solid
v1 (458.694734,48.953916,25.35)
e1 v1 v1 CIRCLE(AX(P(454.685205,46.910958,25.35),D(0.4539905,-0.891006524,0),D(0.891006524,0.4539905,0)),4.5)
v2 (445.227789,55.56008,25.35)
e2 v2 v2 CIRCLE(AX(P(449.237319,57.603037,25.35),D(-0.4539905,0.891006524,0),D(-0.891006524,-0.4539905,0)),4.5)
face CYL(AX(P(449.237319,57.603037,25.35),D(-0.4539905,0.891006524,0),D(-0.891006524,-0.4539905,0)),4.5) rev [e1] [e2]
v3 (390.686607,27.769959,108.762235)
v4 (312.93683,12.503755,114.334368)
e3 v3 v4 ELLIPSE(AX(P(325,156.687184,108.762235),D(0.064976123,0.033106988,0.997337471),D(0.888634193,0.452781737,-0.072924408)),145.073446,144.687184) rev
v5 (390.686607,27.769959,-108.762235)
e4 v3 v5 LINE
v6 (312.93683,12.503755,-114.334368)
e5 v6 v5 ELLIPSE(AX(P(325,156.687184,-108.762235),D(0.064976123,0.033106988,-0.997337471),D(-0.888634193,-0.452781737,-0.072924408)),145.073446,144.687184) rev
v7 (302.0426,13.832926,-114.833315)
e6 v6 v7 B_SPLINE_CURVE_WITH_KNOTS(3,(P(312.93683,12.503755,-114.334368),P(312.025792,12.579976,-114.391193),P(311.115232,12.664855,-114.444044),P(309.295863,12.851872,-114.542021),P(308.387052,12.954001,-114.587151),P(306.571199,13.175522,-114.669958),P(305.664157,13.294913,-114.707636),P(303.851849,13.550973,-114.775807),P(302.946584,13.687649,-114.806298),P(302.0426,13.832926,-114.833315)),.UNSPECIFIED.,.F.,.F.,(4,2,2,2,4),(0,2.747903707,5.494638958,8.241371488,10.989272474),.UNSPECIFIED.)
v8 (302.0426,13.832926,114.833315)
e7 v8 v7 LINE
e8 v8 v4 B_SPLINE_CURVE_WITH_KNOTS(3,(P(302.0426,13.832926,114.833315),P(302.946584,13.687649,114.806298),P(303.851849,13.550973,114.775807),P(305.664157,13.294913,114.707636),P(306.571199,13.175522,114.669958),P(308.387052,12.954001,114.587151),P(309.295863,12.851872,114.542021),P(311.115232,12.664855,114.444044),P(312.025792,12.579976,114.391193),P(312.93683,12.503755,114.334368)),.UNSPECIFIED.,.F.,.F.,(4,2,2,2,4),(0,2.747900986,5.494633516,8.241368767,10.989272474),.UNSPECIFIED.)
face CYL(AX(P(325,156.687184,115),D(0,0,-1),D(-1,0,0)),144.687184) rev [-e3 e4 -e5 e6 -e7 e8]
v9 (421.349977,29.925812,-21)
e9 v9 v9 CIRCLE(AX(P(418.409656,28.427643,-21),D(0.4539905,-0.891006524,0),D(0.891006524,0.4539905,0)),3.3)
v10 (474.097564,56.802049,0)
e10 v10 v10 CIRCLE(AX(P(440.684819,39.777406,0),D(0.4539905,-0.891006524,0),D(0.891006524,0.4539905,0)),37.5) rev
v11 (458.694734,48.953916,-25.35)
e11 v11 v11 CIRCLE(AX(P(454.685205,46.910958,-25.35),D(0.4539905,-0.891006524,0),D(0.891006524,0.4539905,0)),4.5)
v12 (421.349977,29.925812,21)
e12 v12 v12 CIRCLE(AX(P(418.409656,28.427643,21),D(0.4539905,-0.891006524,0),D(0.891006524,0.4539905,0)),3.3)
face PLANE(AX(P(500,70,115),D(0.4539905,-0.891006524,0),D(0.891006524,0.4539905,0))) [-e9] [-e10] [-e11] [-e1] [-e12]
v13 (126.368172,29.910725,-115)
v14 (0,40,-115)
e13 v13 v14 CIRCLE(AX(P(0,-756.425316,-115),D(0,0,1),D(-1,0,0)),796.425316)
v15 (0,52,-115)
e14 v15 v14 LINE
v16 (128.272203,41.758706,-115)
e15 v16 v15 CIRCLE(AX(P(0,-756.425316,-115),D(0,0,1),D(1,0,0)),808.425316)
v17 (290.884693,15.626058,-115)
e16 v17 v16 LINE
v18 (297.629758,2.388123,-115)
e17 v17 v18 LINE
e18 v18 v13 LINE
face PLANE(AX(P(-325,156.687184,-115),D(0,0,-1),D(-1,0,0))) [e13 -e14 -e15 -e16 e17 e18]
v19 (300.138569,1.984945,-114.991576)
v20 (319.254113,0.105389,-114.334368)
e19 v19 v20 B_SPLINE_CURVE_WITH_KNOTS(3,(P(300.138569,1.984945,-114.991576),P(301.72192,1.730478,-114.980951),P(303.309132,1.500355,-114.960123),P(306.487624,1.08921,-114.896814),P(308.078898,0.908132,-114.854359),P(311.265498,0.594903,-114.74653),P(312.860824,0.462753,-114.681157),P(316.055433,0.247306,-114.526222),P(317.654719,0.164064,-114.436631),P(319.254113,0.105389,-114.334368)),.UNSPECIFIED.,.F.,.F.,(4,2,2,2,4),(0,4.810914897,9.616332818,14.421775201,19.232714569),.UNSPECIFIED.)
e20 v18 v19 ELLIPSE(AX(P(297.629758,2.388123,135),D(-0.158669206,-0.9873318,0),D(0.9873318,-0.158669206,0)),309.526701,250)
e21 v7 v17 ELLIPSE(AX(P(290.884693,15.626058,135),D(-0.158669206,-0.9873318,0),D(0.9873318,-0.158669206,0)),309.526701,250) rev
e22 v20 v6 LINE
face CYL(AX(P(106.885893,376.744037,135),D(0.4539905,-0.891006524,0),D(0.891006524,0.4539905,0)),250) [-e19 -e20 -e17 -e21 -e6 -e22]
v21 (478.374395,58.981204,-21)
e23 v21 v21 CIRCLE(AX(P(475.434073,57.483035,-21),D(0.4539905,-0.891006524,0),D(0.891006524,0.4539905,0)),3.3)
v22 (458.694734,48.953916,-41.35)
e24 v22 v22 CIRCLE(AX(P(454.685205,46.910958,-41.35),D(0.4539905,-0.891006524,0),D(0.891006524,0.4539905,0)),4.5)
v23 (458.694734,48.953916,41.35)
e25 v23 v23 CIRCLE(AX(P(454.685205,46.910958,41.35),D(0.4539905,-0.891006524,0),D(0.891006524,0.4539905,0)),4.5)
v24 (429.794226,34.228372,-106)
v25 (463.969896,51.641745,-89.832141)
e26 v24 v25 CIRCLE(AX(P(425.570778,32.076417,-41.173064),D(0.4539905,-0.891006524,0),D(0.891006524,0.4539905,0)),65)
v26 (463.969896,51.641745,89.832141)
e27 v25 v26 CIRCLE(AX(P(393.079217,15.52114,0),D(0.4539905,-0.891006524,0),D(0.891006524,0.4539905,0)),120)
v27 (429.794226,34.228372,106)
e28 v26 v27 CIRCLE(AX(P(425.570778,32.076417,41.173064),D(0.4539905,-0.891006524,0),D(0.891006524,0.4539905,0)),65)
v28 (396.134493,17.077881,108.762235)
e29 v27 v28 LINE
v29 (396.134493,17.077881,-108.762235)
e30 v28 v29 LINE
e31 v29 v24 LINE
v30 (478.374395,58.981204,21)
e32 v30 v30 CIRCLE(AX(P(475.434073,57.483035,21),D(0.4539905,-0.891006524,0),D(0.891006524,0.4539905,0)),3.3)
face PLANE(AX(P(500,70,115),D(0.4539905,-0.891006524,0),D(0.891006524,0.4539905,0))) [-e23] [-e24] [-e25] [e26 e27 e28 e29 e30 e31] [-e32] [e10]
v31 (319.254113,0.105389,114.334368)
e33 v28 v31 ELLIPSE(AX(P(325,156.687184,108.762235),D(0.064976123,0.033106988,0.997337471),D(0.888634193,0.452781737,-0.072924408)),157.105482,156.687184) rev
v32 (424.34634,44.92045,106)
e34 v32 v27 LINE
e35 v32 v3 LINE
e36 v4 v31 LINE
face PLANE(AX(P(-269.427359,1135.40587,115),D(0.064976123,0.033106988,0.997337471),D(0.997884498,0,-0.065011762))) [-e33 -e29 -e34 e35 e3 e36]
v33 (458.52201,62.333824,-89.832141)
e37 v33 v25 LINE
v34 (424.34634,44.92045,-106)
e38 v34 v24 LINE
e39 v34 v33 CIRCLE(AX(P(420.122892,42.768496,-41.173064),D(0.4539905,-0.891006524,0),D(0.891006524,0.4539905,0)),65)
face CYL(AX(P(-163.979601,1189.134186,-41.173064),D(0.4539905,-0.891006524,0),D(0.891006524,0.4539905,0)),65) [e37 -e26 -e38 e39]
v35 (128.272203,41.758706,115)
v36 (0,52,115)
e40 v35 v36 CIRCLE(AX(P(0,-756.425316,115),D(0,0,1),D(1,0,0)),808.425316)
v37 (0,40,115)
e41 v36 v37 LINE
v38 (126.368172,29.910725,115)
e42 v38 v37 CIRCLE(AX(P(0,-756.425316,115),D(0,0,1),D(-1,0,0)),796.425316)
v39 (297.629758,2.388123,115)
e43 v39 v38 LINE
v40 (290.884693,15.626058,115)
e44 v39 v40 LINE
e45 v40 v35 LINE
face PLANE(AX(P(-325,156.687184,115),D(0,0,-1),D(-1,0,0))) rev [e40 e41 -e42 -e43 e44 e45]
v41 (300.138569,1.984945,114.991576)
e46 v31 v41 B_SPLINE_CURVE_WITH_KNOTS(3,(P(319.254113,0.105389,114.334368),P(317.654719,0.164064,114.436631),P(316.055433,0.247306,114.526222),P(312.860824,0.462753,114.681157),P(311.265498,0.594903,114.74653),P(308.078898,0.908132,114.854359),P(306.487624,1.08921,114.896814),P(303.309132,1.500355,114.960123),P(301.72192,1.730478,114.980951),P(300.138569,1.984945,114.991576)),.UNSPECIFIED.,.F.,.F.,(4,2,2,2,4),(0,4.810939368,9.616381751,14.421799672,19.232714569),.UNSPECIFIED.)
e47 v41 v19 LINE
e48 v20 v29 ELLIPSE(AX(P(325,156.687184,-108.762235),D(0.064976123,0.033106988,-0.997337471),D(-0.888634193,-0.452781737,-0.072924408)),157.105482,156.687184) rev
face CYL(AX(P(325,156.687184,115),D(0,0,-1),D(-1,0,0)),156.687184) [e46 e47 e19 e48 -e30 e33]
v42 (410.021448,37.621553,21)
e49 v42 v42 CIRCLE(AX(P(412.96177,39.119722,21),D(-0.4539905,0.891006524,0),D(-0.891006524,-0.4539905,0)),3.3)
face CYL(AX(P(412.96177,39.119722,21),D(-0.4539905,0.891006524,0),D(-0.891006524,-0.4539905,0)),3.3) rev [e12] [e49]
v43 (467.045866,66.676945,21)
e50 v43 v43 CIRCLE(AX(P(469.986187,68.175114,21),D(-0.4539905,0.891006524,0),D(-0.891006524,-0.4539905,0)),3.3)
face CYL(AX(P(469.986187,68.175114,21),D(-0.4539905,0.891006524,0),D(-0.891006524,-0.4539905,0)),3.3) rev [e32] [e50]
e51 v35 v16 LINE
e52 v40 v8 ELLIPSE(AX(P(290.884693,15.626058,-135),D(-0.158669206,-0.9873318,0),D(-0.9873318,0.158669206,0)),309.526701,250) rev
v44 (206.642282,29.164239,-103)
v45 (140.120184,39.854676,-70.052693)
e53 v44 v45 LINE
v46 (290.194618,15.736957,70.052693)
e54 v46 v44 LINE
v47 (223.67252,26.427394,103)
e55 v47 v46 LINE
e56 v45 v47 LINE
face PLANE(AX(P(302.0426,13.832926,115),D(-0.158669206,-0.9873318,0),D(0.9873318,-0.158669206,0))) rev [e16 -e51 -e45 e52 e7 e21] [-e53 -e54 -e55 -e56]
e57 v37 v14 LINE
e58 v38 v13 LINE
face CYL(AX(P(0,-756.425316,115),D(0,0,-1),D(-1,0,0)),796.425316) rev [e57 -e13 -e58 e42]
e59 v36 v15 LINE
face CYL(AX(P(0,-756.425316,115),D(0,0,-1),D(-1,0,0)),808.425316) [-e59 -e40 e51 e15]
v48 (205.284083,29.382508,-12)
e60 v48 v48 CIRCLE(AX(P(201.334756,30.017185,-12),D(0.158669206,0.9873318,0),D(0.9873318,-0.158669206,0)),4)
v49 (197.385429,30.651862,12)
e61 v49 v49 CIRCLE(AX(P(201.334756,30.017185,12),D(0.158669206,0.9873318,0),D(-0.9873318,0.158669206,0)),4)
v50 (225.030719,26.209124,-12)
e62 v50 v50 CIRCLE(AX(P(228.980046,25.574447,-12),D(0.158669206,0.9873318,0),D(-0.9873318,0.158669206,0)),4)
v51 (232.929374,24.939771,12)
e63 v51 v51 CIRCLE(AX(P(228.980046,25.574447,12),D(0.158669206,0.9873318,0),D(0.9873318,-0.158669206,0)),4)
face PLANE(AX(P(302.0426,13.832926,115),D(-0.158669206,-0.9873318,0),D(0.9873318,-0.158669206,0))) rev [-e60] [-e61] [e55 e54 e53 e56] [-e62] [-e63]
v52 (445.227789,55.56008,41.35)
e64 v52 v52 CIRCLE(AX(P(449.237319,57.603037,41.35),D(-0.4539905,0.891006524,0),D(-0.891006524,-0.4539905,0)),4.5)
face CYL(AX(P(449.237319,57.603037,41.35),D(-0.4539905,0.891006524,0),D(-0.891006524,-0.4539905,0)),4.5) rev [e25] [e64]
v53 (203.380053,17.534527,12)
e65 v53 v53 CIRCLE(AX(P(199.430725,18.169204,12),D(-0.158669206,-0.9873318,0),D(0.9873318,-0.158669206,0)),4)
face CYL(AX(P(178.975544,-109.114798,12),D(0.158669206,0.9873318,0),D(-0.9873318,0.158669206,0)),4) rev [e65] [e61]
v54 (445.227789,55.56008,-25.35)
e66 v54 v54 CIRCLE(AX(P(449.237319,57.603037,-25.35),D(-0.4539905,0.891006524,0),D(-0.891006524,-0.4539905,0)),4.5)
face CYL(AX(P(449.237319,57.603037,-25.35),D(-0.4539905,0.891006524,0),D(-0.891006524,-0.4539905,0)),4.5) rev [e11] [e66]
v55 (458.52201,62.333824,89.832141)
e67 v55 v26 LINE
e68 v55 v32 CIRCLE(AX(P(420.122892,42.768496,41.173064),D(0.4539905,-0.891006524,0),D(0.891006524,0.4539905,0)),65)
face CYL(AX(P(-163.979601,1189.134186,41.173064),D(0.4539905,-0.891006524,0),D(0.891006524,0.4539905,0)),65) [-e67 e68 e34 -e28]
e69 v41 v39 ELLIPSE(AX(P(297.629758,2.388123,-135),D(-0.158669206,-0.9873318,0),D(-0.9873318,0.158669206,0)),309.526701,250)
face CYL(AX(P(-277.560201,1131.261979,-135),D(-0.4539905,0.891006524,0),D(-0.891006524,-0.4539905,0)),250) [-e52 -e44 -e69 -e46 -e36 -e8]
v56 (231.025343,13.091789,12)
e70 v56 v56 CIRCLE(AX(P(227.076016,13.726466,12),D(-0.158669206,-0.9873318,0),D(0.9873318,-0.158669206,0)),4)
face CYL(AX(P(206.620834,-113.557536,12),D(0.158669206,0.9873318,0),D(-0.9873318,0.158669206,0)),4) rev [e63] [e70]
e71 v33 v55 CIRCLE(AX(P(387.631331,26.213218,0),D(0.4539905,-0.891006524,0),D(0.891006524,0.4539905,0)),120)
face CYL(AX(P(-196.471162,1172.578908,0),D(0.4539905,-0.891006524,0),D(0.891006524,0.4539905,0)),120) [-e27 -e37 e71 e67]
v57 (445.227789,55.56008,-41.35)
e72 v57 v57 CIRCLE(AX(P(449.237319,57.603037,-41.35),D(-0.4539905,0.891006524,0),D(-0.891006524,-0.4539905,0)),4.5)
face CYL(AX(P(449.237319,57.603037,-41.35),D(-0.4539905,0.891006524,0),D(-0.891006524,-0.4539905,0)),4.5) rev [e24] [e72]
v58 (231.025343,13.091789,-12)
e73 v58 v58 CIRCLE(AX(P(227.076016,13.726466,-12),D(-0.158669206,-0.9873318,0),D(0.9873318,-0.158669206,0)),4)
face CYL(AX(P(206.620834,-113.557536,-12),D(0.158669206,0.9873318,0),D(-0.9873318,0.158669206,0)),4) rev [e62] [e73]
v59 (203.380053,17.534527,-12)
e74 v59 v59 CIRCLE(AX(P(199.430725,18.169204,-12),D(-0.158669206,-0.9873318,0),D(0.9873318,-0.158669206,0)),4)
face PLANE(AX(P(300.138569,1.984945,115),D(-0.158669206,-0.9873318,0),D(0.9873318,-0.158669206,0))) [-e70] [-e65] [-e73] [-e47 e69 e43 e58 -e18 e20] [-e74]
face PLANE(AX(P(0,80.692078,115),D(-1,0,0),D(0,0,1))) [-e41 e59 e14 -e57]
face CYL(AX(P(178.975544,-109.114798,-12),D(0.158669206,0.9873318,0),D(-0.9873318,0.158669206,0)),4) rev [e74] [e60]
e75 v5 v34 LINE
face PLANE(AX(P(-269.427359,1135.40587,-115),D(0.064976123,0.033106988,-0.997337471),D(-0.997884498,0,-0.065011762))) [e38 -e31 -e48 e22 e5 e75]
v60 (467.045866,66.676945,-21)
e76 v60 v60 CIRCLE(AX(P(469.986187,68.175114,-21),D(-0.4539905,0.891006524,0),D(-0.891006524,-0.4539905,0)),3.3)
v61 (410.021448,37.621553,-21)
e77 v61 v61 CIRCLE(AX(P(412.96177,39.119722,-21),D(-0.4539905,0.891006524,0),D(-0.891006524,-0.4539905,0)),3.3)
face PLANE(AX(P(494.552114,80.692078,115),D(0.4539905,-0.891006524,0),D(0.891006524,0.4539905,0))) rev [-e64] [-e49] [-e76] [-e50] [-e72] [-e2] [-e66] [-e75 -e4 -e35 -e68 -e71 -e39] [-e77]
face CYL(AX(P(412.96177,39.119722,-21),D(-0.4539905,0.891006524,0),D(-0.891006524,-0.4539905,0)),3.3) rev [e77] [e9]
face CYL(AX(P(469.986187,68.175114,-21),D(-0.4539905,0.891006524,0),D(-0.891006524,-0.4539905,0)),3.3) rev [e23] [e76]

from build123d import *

# Parameters (mm, degrees)
EXTRUDE_THIN1_DEPTH  = 115
CUT_EXTRUDE1_DEPTH   = 620.892995583
FILLET1_R            = 250
SKETCH3_R            = 4
BINDING_HOLES_DEPTH  = 527.107084161
SKETCH4_R            = 4
CUT_EXTRUDE2_DEPTH   = 947.891927405
M6_CLEARANCE_HOLE1_D = 6.6
M8_CLEARANCE_HOLE1_D = 9
SKETCH9_W            = 500
SKETCH9_H            = 230
CUT_EXTRUDE3_DEPTH   = 520.361349661


with BuildPart() as part:
    # Sketch1 → Extrude-Thin1 (new, symmetric)
    with BuildSketch(Plane.XY):
        with BuildLine():
            Line((-500, 70), (-396.134492808, 17.077880761))
            ThreePointArc((-396.134492808, 17.077880761), (-349.336150967, 1.90144375), (-300.138569045, 1.984944587))
            Line((-300.138569045, 1.984944587), (-126.368172253, 29.91072477))
            ThreePointArc((-126.368172253, 29.91072477), (0, 40), (126.368172253, 29.91072477))
            Line((126.368172253, 29.91072477), (300.138569045, 1.984944587))
            ThreePointArc((300.138569045, 1.984944587), (349.336150967, 1.90144375), (396.134492808, 17.077880761))
            Line((396.134492808, 17.077880761), (500, 70))
            Line((500, 70), (494.552114003, 80.69207829))
            Line((494.552114003, 80.69207829), (390.686606812, 27.769959051))
            ThreePointArc((390.686606812, 27.769959051), (347.472349444, 13.755820321), (302.042599512, 13.832926187))
            Line((302.042599512, 13.832926187), (128.27220272, 41.75870637))
            ThreePointArc((128.27220272, 41.75870637), (0, 52), (-128.27220272, 41.75870637))
            Line((-128.27220272, 41.75870637), (-302.042599512, 13.832926187))
            ThreePointArc((-302.042599512, 13.832926187), (-347.472349444, 13.755820321), (-390.686606812, 27.769959051))
            Line((-390.686606812, 27.769959051), (-494.552114003, 80.69207829))
            Line((-494.552114003, 80.69207829), (-500, 70))
        make_face()
    extrude(amount=EXTRUDE_THIN1_DEPTH, both=True)

    # Sketch2 → Cut-Extrude1 (cut, symmetric)
    with BuildSketch(Plane(origin=(-69.290206127, -135.989686473, 0), x_dir=(-0.8910065241883677, 0.4539904997395473, 0), z_dir=(0.45399049973954725, 0.8910065241883676, 0))):
        with BuildLine():
            Line((-1243.954382633, 226.09395148), (275.40194382, 115))
            Line((275.40194382, 115), (398.488815391, 106))
            ThreePointArc((398.488815391, 106), (418.996120575, 101.069384919), (436.845066451, 89.8321405))
            ThreePointArc((436.845066451, 89.8321405), (477.282597076, 0), (436.845066451, -89.8321405))
            ThreePointArc((436.845066451, -89.8321405), (418.996120575, -101.069384919), (398.488815391, -106))
            Line((398.488815391, -106), (275.40194382, -115))
            Line((275.40194382, -115), (-1243.954382633, -226.09395148))
            Line((-1243.954382633, -226.09395148), (1802.870530478, -226.09395148))
            Line((1802.870530478, -226.09395148), (1802.870530478, 226.09395148))
            Line((1802.870530478, 226.09395148), (-1243.954382633, 226.09395148))
        make_face()
    cut_extrude1 = extrude(amount=CUT_EXTRUDE1_DEPTH, both=True, mode=Mode.SUBTRACT)

    # Mirror1: Cut-Extrude1 across plane
    add(cut_extrude1.mirror(Plane(origin=(0, 0, 0), x_dir=(0, 0, 1), z_dir=(1, 0, 0))), mode=Mode.SUBTRACT)

    # Fillet1
    # the kernel refuses this fillet: 250 mm, written as the material it takes off along each edge
    with BuildSketch(Plane(origin=(-319.014996724, -19.477278886, 115), x_dir=(-0.8886341933277065, 0.4527817367914195, -0.07292440796442752), z_dir=(0.45399049973954736, 0.8910065241883677, 0))) as fillet1_piece_1:
        with BuildLine():
            CenterArc((FILLET1_R * 0.0365108095299, -FILLET1_R), FILLET1_R, 90, 4.181973001)
            Line((-FILLET1_R * 0.0364135984345, -FILLET1_R * 0.00266252916927), (-FILLET1_R * 0.0378720865938, FILLET1_R * 0.0172842202473))
            Line((-FILLET1_R * 0.0378720865938, FILLET1_R * 0.0172842202473), (-FILLET1_R * 0.000730216190598, FILLET1_R * 0.02))
            Line((-FILLET1_R * 0.000730216190598, FILLET1_R * 0.02), (FILLET1_R * 0.0365108095299, FILLET1_R * 0.02))
            Line((FILLET1_R * 0.0365108095299, FILLET1_R * 0.02), (FILLET1_R * 0.0365108095299, 0))
        make_face()
    extrude(amount=60.204173091, mode=Mode.SUBTRACT)
    # the kernel refuses this fillet: 250 mm, written as the material it takes off along each edge
    with BuildSketch(Plane(origin=(319.014996724, -19.477278886, 115), x_dir=(-0.8910065241883677, -0.4539904997395473, 0), z_dir=(-0.45399049973954736, 0.8910065241883677, 0))) as fillet1_2_piece_1:
        with BuildLine():
            CenterArc((FILLET1_R * 0.0365108095299, -FILLET1_R), FILLET1_R, 90, 4.181973001)
            Line((-FILLET1_R * 0.0364135984345, -FILLET1_R * 0.00266252916927), (-FILLET1_R * 0.0378720865938, FILLET1_R * 0.0172842202473))
            Line((-FILLET1_R * 0.0378720865938, FILLET1_R * 0.0172842202473), (-FILLET1_R * 0.000730216190598, FILLET1_R * 0.02))
            Line((-FILLET1_R * 0.000730216190598, FILLET1_R * 0.02), (FILLET1_R * 0.0365108095299, FILLET1_R * 0.02))
            Line((FILLET1_R * 0.0365108095299, FILLET1_R * 0.02), (FILLET1_R * 0.0365108095299, 0))
        make_face()
    extrude(amount=60.204173091, mode=Mode.SUBTRACT)
    # the kernel refuses this fillet: 250 mm, written as the material it takes off along each edge
    with BuildSketch(Plane(origin=(-319.014996724, -19.477278886, -115), x_dir=(0.8910065241883677, -0.4539904997395473, 0), z_dir=(0.4539904997395473, 0.8910065241883677, 0))) as fillet1_3_piece_1:
        with BuildLine():
            CenterArc((FILLET1_R * 0.0365108095299, -FILLET1_R), FILLET1_R, 90, 4.181973001)
            Line((-FILLET1_R * 0.0364135984345, -FILLET1_R * 0.00266252916927), (-FILLET1_R * 0.0378720865938, FILLET1_R * 0.0172842202473))
            Line((-FILLET1_R * 0.0378720865938, FILLET1_R * 0.0172842202473), (-FILLET1_R * 0.000730216190598, FILLET1_R * 0.02))
            Line((-FILLET1_R * 0.000730216190598, FILLET1_R * 0.02), (FILLET1_R * 0.0365108095299, FILLET1_R * 0.02))
            Line((FILLET1_R * 0.0365108095299, FILLET1_R * 0.02), (FILLET1_R * 0.0365108095299, 0))
        make_face()
    extrude(amount=60.204173091, mode=Mode.SUBTRACT)
    # the kernel refuses this fillet: 250 mm, written as the material it takes off along each edge
    with BuildSketch(Plane(origin=(319.014996724, -19.477278886, -115), x_dir=(-0.8910065241883677, -0.4539904997395473, 0), z_dir=(-0.4539904997395473, 0.8910065241883677, 0))) as fillet1_4_piece_1:
        with BuildLine():
            CenterArc((FILLET1_R * 0.0365108095299, FILLET1_R), FILLET1_R, 265.818026999, 4.181973001)
            Line((-FILLET1_R * 0.0364135984345, FILLET1_R * 0.00266252916927), (-FILLET1_R * 0.0378720865938, -FILLET1_R * 0.0172842202473))
            Line((-FILLET1_R * 0.0378720865938, -FILLET1_R * 0.0172842202473), (-FILLET1_R * 0.000730216190598, -FILLET1_R * 0.02))
            Line((-FILLET1_R * 0.000730216190598, -FILLET1_R * 0.02), (FILLET1_R * 0.0365108095299, -FILLET1_R * 0.02))
            Line((FILLET1_R * 0.0365108095299, -FILLET1_R * 0.02), (FILLET1_R * 0.0365108095299, 0))
        make_face()
    extrude(amount=60.204173091, mode=Mode.SUBTRACT)

    # Sketch3 → Binding Holes (cut, through all)
    with BuildSketch(Plane(origin=(-9.771253847, 60.8024072, 0), x_dir=(-0.9873317999532861, -0.15866920558509276, 0), z_dir=(-0.15866920558509276, 0.9873317999532861, 0))):
        with Locations((222.02140403, 12)):
            Circle(SKETCH3_R)
        with Locations(Location((222.02140403, -12, 0), (0, 0, 180))):
            Circle(SKETCH3_R)
        with Locations((194.02140403, -12)):
            Circle(SKETCH3_R)
        with Locations(Location((194.02140403, 12, 0), (0, 0, 180))):
            Circle(SKETCH3_R)
    extrude(amount=-BINDING_HOLES_DEPTH, mode=Mode.SUBTRACT)

    # Sketch4 → Cut-Extrude2 (cut, through all)
    with BuildSketch(Plane(origin=(430.771006706, -6.854378838, -35.350500744), x_dir=(-0.9873317999532861, 0.15866920558509276, 0), z_dir=(0.15866920558509276, 0.9873317999532861, 0))):
        with Locations((232.380088234, 47.350500744)):
            Circle(SKETCH4_R)
        with Locations(Location((232.380088234, 23.350500744, 0), (0, 0, 180))):
            Circle(SKETCH4_R)
        with Locations((204.380088234, 23.350500744)):
            Circle(SKETCH4_R)
        with Locations(Location((204.380088234, 47.350500744, 0), (0, 0, 180))):
            Circle(SKETCH4_R)
    extrude(amount=-CUT_EXTRUDE2_DEPTH, mode=Mode.SUBTRACT)

    # M6 Clearance Hole1 (through all)
    with Locations(Plane(origin=(-49.331097603, -146.159360215, -63.345400331), x_dir=(-0.8910065241883677, 0.4539904997395473, 0), z_dir=(0.45399049973954725, 0.8910065241883676, 0))):
        with Locations((472.112244346, 84.345400331), (408.112244346, 84.345400331), (408.112244346, 42.345400331), (472.112244346, 42.345400331)):
            m6_clearance_hole1 = Hole(M6_CLEARANCE_HOLE1_D / 2)

    # M8 Clearance Hole1 (through all)
    with Locations(Plane(origin=(-70.616279149, -135.31401852, -54.210944478), x_dir=(-0.8910065241883677, 0.4539904997395473, 0), z_dir=(0.45399049973954725, 0.8910065241883676, 0))):
        with Locations((424.936326624, 95.560944478), (424.936326624, 79.560944478), (424.936326624, 12.860944478), (424.936326624, 28.860944478)):
            m8_clearance_hole1 = Hole(M8_CLEARANCE_HOLE1_D / 2)

    # Mirror2: M6 Clearance Hole1, M8 Clearance Hole1 across plane
    add(m6_clearance_hole1.mirror(Plane(origin=(0, 0, 0), x_dir=(0, 0, 1), z_dir=(1, 0, 0))), mode=Mode.SUBTRACT)
    add(m8_clearance_hole1.mirror(Plane(origin=(0, 0, 0), x_dir=(0, 0, 1), z_dir=(1, 0, 0))), mode=Mode.SUBTRACT)

    # Sketch9 → Cut-Extrude3 (cut, through all)
    with BuildSketch(Plane(origin=(0, 0, 0), x_dir=(1, 0, 0), z_dir=(0, 1, 0))):
        with Locations((-250, 0)):
            Rectangle(SKETCH9_W, SKETCH9_H)
    extrude(amount=CUT_EXTRUDE3_DEPTH, mode=Mode.SUBTRACT)


solid = part.part
